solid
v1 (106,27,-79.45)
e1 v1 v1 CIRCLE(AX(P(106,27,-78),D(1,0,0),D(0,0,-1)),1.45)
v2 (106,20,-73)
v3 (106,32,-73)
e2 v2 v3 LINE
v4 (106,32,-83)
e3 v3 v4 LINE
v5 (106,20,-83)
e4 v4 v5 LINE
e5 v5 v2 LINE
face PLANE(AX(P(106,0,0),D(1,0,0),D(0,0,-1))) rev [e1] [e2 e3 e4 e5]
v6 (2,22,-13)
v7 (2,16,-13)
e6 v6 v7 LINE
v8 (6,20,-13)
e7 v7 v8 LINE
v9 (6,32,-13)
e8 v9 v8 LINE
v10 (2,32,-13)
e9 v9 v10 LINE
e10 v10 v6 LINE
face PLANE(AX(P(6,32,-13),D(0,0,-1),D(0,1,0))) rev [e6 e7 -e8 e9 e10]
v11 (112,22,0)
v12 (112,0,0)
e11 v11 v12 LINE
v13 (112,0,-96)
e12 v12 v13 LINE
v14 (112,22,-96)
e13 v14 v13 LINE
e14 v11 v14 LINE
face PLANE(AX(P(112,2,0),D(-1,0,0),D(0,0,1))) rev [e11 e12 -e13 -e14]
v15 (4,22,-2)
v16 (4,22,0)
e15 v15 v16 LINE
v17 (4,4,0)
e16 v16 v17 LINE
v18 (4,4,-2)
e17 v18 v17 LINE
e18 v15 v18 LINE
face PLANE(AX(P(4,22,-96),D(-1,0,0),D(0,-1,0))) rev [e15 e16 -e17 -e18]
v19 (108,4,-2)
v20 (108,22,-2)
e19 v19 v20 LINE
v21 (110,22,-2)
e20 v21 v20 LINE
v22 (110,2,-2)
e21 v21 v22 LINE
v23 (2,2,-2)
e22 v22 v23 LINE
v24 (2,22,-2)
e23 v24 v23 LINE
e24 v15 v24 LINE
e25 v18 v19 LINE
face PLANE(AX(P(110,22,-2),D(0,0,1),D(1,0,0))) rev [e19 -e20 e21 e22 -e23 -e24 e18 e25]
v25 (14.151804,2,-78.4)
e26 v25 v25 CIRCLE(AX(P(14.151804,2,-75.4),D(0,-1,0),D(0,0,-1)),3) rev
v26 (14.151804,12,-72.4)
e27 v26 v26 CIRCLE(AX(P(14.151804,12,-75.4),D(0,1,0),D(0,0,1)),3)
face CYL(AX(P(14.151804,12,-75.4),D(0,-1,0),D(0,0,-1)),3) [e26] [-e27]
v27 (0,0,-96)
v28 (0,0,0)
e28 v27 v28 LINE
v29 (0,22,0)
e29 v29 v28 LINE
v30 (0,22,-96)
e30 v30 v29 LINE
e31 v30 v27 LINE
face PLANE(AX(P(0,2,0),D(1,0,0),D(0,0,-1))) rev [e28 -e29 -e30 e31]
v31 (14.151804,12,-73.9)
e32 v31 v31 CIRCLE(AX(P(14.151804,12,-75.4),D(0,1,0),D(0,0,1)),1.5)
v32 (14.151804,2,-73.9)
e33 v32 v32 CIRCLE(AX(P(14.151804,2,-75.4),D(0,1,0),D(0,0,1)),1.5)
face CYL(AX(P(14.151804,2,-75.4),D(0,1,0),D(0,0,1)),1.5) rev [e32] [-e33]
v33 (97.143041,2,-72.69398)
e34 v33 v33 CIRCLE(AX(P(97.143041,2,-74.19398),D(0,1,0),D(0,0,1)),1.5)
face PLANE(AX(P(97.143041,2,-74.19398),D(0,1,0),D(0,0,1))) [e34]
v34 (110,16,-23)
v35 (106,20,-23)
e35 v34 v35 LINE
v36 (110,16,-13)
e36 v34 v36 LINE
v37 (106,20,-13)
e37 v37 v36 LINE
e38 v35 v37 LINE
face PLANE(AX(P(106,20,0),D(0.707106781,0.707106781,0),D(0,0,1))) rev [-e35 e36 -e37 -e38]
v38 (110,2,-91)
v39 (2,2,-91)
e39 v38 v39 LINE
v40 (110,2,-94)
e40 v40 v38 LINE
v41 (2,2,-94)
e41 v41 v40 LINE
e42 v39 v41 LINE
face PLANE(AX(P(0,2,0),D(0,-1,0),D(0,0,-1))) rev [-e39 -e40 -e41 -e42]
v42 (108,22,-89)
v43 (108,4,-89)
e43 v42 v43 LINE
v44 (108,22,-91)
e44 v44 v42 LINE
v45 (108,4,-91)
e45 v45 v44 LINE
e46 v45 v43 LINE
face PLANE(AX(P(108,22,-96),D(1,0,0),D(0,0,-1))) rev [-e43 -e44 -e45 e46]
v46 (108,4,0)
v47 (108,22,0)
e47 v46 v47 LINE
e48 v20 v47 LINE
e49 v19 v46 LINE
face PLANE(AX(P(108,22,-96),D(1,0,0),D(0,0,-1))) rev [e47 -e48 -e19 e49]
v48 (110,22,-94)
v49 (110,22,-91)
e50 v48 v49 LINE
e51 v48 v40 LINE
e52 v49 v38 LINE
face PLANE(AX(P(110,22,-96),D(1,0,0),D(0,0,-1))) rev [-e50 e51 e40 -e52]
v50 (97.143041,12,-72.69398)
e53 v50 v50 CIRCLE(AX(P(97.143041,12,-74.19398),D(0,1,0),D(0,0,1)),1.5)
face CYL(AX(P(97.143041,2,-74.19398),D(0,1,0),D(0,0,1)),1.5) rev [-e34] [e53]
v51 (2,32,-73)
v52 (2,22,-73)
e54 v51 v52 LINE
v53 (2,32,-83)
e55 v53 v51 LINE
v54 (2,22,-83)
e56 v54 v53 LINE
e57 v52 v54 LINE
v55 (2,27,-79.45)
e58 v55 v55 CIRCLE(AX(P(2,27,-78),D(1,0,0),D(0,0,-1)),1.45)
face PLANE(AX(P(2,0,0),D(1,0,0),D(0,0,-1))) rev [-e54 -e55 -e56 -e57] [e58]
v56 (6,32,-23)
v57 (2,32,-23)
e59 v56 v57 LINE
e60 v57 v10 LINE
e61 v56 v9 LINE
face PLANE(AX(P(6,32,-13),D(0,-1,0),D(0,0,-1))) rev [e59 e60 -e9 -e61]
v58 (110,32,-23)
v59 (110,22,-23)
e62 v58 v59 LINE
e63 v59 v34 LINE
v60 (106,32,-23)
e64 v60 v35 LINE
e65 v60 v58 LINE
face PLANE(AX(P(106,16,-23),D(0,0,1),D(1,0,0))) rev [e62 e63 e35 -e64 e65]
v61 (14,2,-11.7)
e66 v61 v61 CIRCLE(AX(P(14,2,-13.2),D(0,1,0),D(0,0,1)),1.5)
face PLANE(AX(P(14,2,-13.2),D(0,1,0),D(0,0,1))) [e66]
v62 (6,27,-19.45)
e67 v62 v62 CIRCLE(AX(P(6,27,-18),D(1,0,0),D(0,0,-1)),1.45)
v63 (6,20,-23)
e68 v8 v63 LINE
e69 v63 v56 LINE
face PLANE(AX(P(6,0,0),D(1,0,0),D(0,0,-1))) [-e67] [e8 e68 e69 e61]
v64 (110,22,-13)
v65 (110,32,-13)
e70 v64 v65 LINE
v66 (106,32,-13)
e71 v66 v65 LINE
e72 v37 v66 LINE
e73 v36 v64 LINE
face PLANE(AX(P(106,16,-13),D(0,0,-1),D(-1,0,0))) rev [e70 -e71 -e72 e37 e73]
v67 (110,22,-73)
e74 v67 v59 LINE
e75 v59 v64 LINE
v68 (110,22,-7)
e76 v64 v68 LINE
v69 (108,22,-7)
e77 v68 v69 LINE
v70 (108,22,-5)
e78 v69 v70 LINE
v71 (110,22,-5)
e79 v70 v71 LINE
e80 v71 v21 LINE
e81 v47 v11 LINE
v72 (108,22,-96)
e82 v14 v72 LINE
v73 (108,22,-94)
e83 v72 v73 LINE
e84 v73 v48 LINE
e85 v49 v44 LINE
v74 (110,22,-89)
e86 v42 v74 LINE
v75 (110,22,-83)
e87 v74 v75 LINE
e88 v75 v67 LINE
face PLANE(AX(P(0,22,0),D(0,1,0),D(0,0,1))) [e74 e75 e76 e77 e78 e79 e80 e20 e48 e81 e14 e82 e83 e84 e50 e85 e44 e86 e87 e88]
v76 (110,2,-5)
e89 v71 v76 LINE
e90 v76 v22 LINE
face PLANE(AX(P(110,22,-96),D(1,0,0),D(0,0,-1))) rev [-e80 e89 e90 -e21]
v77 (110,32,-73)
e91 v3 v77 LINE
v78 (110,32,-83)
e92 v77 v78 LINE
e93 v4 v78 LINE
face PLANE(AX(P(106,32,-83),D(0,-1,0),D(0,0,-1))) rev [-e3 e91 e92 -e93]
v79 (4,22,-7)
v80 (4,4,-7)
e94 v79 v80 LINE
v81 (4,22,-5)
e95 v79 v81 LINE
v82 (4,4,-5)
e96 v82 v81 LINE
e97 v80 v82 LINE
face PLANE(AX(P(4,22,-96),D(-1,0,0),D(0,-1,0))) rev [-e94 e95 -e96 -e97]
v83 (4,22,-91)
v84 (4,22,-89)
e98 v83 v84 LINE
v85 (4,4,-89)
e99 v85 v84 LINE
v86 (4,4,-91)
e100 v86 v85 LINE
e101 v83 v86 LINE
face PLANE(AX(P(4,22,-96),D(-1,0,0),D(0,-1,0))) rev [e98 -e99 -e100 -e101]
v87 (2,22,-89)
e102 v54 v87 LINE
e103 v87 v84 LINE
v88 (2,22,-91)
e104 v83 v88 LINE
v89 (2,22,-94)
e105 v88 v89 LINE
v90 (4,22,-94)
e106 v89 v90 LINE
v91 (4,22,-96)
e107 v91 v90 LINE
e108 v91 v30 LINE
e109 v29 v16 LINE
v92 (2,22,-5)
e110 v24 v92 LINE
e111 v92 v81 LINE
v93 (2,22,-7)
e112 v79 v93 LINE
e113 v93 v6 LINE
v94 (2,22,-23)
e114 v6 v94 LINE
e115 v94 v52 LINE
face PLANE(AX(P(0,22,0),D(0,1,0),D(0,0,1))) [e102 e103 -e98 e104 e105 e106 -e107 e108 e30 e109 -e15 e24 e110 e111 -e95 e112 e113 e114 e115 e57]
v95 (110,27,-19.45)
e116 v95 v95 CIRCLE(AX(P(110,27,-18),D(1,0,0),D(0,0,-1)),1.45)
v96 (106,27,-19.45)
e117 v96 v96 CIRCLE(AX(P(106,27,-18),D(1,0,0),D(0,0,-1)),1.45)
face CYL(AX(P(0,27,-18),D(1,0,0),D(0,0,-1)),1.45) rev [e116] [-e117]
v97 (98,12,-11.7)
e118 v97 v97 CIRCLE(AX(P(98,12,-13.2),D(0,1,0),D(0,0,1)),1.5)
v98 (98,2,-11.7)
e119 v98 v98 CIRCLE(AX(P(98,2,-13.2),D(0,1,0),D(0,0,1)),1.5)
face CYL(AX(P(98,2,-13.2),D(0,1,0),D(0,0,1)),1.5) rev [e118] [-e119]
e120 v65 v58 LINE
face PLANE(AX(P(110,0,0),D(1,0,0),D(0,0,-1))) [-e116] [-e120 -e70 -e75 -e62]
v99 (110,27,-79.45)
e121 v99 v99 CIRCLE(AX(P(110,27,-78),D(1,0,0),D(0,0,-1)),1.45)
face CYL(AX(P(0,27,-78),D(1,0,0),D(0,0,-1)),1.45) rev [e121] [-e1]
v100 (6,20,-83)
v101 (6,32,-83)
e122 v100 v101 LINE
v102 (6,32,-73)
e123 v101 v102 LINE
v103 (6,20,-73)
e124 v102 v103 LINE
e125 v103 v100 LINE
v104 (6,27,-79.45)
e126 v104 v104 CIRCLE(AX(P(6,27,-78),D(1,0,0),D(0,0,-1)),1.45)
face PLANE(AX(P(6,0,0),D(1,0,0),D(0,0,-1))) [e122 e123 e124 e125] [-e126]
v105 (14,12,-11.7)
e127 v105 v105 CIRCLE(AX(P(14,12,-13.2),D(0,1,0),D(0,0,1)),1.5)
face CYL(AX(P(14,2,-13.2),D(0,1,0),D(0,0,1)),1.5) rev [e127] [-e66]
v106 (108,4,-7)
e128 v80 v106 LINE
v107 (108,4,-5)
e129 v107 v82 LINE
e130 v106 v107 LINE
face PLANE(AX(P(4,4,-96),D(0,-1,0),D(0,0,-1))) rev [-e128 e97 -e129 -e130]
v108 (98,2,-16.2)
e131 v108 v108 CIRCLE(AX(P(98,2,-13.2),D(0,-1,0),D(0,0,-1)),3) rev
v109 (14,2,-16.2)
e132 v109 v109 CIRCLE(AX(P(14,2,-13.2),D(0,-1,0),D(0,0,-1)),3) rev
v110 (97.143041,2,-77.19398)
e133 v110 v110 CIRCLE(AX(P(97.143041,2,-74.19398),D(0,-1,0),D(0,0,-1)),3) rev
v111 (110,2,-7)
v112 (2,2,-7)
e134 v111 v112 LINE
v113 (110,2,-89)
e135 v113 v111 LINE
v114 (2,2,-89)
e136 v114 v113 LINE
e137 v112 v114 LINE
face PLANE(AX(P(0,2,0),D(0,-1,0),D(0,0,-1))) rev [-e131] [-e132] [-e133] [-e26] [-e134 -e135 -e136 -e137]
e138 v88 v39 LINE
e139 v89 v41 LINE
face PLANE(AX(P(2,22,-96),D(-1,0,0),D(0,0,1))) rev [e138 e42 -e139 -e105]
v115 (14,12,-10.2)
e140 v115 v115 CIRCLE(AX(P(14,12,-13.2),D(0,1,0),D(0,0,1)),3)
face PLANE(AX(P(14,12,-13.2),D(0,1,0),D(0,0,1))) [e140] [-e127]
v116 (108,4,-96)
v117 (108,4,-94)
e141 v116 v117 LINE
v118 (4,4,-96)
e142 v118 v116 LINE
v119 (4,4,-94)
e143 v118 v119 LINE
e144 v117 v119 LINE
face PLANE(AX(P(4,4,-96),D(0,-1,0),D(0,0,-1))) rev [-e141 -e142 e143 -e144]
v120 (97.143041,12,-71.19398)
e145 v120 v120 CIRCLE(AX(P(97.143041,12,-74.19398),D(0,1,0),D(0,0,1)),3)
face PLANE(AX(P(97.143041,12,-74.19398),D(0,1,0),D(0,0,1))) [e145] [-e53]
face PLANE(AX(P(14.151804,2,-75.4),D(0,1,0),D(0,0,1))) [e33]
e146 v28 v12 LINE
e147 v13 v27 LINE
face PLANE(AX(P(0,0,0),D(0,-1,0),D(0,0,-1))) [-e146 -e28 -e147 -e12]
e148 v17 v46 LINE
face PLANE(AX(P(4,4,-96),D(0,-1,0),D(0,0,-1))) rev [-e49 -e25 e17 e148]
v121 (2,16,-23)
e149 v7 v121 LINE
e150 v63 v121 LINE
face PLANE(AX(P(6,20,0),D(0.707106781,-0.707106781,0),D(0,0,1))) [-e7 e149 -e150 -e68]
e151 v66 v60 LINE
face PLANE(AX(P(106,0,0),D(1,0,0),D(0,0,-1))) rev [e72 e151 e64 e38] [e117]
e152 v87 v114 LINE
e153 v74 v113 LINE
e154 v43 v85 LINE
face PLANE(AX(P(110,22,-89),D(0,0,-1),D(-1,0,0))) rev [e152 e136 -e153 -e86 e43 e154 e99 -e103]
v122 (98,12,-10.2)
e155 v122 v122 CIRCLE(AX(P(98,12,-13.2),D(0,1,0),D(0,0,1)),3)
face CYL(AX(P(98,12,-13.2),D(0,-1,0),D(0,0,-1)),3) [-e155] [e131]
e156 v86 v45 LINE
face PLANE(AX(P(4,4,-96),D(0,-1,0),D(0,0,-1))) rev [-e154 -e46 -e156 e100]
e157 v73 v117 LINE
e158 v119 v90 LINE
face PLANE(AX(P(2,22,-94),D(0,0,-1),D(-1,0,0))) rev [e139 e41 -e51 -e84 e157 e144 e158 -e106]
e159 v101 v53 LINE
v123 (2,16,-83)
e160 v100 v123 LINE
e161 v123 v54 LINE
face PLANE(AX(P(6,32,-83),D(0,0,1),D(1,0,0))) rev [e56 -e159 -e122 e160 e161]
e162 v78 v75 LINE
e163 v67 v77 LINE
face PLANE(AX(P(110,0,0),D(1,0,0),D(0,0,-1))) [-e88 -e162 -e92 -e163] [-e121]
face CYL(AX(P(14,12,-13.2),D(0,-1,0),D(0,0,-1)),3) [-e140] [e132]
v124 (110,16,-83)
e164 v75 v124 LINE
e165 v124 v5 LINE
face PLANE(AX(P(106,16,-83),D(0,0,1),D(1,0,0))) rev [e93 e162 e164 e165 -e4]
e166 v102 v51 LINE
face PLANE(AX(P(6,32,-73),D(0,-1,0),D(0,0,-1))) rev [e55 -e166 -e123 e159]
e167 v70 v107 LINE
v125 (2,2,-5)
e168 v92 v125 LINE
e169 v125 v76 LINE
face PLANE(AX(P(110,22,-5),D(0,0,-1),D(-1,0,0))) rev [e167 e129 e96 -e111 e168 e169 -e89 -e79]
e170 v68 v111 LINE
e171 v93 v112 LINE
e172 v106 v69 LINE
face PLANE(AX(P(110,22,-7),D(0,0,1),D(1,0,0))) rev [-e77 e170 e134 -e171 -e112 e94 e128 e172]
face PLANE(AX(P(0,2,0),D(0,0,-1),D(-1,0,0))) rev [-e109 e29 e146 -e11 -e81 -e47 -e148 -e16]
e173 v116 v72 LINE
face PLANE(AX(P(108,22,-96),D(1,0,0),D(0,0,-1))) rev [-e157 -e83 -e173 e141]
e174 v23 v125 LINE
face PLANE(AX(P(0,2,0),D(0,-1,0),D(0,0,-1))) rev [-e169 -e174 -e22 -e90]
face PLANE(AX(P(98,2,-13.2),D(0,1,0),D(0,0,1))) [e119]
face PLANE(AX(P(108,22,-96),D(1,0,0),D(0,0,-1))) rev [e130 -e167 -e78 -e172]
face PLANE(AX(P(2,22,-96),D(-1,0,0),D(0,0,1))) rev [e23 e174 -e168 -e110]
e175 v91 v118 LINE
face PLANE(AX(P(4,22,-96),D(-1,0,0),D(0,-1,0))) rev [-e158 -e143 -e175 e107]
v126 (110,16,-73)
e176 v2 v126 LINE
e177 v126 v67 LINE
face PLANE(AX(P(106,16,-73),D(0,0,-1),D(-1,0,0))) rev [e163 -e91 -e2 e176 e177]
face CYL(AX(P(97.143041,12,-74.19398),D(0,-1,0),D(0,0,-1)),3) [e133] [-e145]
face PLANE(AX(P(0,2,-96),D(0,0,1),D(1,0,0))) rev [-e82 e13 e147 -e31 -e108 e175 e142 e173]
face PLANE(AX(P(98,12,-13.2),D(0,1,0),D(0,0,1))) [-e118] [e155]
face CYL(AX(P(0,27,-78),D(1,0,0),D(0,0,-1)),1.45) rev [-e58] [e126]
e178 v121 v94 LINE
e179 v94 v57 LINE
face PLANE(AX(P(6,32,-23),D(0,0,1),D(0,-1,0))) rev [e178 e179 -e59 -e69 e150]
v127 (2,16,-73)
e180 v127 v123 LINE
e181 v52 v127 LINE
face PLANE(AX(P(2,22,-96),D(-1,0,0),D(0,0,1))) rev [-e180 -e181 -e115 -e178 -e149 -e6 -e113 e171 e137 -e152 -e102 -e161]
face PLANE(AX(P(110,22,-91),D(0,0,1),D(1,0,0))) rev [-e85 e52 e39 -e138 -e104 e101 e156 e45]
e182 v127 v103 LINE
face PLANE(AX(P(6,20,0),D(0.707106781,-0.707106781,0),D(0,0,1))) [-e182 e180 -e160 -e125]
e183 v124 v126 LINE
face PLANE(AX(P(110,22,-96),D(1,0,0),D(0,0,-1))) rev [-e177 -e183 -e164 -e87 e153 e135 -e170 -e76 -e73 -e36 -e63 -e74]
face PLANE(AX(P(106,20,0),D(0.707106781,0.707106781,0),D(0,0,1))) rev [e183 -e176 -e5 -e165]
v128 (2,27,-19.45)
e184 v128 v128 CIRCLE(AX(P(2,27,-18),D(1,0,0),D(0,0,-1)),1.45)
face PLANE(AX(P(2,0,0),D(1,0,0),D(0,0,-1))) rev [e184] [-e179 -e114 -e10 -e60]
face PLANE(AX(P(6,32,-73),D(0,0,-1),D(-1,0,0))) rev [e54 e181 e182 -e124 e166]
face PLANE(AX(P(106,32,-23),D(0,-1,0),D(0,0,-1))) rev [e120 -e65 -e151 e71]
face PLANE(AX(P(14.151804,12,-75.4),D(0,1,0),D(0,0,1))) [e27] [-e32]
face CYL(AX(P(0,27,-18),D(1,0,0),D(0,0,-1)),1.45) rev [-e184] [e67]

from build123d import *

# Parameters (mm, degrees)
ESBO_O1_W                = 112
ESBO_O1_H                = 96
RESSALTO_EXTRUS_O1_DEPTH = 2
ESBO_O2_W                = 2
ESBO_O2_H                = 96
RESSALTO_EXTRUS_O2_DEPTH = 20
ESBO_O3_W                = 108
ESBO_O3_H                = 2
RESSALTO_EXTRUS_O3_DEPTH = 20
ESBO_O5_W                = 104
ESBO_O5_H                = 18
CORTE_EXTRUS_O1_DEPTH    = 150.1442255
ESBO_O6_R                = 3
RESSALTO_EXTRUS_O4_DEPTH = 10
ESBO_O7_R                = 1.5
CORTE_EXTRUS_O2_DEPTH    = 10
ESBO_O8_W                = 10
ESBO_O8_H                = 16
RESSALTO_EXTRUS_O5_DEPTH = 4
ESBO_O9_W                = 10
ESBO_O9_H                = 16
RESSALTO_EXTRUS_O6_DEPTH = 4
ESBO_O10_R               = 1.45
CORTE_EXTRUS_O3_DEPTH    = 150.465715132
CHANFRO2_SIZE            = 4


with BuildPart() as part:
    # Esboço1 → Ressalto-extrusão1 (new body)
    with BuildSketch(Plane(origin=(0, 0, 0), x_dir=(1, 0, 0), z_dir=(0, 1, 0))):
        with Locations((56, 48)):
            Rectangle(ESBO_O1_W, ESBO_O1_H)
    extrude(amount=RESSALTO_EXTRUS_O1_DEPTH)

    # Esboço2 → Ressalto-extrusão2 (add)
    with BuildSketch(Plane(origin=(0, 2, 0), x_dir=(1, 0, 0), z_dir=(0, 1, 0))):
        with Locations((1, 48)):
            Rectangle(ESBO_O2_W, ESBO_O2_H)
        with Locations((111, 48)):
            Rectangle(ESBO_O2_W, ESBO_O2_H)
    extrude(amount=RESSALTO_EXTRUS_O2_DEPTH)

    # Esboço3 → Ressalto-extrusão3 (add)
    with BuildSketch(Plane(origin=(0, 2, 0), x_dir=(1, 0, 0), z_dir=(0, 1, 0))):
        with Locations((56, 95)):
            Rectangle(ESBO_O3_W, ESBO_O3_H)
        with Locations((56, 1)):
            Rectangle(ESBO_O3_W, ESBO_O3_H)
        with Locations((56, 90)):
            Rectangle(ESBO_O3_W, ESBO_O3_H)
        with Locations((56, 6)):
            Rectangle(ESBO_O3_W, ESBO_O3_H)
    extrude(amount=RESSALTO_EXTRUS_O3_DEPTH)

    # Esboço5 → Corte-extrusão1 (cut, through all)
    with BuildSketch(Plane.XY):
        with Locations((56, 13)):
            Rectangle(ESBO_O5_W, ESBO_O5_H)
    extrude(amount=-CORTE_EXTRUS_O1_DEPTH, mode=Mode.SUBTRACT)

    # Esboço6 → Ressalto-extrusão4 (add)
    with BuildSketch(Plane(origin=(0, 2, 0), x_dir=(1, 0, 0), z_dir=(0, 1, 0))):
        with Locations(Location((98, 13.2, 0), (0, 0, 90))):
            Circle(ESBO_O6_R)
        with Locations(Location((14, 13.2, 0), (0, 0, 90))):
            Circle(ESBO_O6_R)
        with Locations(Location((97.143041423, 74.193980211, 0), (0, 0, 90))):
            Circle(ESBO_O6_R)
        with Locations(Location((14.151803836, 75.4, 0), (0, 0, 90))):
            Circle(ESBO_O6_R)
    extrude(amount=RESSALTO_EXTRUS_O4_DEPTH)

    # Esboço7 → Corte-extrusão2 (cut)
    with BuildSketch(Plane(origin=(0, 12, 0), x_dir=(1, 0, 0), z_dir=(0, 1, 0))):
        with Locations(Location((14.151803836, 75.4, 0), (0, 0, 270))):
            Circle(ESBO_O7_R)
        with Locations(Location((97.143041423, 74.193980211, 0), (0, 0, 270))):
            Circle(ESBO_O7_R)
        with Locations(Location((98, 13.2, 0), (0, 0, 270))):
            Circle(ESBO_O7_R)
        with Locations(Location((14, 13.2, 0), (0, 0, 270))):
            Circle(ESBO_O7_R)
    extrude(amount=-CORTE_EXTRUS_O2_DEPTH, mode=Mode.SUBTRACT)

    # Esboço8 → Ressalto-extrusão5 (add)
    with BuildSketch(Plane.ZY.offset(-110)):
        with Locations((-78, 24)):
            Rectangle(ESBO_O8_W, ESBO_O8_H)
        with Locations((-18, 24)):
            Rectangle(ESBO_O8_W, ESBO_O8_H)
    extrude(amount=RESSALTO_EXTRUS_O5_DEPTH)

    # Esboço9 → Ressalto-extrusão6 (add)
    with BuildSketch(Plane(origin=(2, 0, 0), x_dir=(0, 0, -1), z_dir=(1, 0, 0))):
        with Locations((18, 24)):
            Rectangle(ESBO_O9_W, ESBO_O9_H)
        with Locations((78, 24)):
            Rectangle(ESBO_O9_W, ESBO_O9_H)
    extrude(amount=RESSALTO_EXTRUS_O6_DEPTH)

    # Esboço10 → Corte-extrusão3 (cut, through all)
    with BuildSketch(Plane(origin=(110, 0, 0), x_dir=(0, 0, -1), z_dir=(1, 0, 0))):
        with Locations((18, 27)):
            Circle(ESBO_O10_R)
        with Locations((78, 27)):
            Circle(ESBO_O10_R)
    extrude(amount=-CORTE_EXTRUS_O3_DEPTH, mode=Mode.SUBTRACT)

    # Chanfro2
    chanfro2_edges = [part.edges().sort_by_distance(p)[0] for p in [
        (106, 16, -18),
        (106, 16, -78),
        (6, 16, -78),
        (6, 16, -18),
    ]]
    chamfer(chanfro2_edges, length=CHANFRO2_SIZE - 0.0001)  # a hair under: the kernel refuses the full size


solid = part.part
